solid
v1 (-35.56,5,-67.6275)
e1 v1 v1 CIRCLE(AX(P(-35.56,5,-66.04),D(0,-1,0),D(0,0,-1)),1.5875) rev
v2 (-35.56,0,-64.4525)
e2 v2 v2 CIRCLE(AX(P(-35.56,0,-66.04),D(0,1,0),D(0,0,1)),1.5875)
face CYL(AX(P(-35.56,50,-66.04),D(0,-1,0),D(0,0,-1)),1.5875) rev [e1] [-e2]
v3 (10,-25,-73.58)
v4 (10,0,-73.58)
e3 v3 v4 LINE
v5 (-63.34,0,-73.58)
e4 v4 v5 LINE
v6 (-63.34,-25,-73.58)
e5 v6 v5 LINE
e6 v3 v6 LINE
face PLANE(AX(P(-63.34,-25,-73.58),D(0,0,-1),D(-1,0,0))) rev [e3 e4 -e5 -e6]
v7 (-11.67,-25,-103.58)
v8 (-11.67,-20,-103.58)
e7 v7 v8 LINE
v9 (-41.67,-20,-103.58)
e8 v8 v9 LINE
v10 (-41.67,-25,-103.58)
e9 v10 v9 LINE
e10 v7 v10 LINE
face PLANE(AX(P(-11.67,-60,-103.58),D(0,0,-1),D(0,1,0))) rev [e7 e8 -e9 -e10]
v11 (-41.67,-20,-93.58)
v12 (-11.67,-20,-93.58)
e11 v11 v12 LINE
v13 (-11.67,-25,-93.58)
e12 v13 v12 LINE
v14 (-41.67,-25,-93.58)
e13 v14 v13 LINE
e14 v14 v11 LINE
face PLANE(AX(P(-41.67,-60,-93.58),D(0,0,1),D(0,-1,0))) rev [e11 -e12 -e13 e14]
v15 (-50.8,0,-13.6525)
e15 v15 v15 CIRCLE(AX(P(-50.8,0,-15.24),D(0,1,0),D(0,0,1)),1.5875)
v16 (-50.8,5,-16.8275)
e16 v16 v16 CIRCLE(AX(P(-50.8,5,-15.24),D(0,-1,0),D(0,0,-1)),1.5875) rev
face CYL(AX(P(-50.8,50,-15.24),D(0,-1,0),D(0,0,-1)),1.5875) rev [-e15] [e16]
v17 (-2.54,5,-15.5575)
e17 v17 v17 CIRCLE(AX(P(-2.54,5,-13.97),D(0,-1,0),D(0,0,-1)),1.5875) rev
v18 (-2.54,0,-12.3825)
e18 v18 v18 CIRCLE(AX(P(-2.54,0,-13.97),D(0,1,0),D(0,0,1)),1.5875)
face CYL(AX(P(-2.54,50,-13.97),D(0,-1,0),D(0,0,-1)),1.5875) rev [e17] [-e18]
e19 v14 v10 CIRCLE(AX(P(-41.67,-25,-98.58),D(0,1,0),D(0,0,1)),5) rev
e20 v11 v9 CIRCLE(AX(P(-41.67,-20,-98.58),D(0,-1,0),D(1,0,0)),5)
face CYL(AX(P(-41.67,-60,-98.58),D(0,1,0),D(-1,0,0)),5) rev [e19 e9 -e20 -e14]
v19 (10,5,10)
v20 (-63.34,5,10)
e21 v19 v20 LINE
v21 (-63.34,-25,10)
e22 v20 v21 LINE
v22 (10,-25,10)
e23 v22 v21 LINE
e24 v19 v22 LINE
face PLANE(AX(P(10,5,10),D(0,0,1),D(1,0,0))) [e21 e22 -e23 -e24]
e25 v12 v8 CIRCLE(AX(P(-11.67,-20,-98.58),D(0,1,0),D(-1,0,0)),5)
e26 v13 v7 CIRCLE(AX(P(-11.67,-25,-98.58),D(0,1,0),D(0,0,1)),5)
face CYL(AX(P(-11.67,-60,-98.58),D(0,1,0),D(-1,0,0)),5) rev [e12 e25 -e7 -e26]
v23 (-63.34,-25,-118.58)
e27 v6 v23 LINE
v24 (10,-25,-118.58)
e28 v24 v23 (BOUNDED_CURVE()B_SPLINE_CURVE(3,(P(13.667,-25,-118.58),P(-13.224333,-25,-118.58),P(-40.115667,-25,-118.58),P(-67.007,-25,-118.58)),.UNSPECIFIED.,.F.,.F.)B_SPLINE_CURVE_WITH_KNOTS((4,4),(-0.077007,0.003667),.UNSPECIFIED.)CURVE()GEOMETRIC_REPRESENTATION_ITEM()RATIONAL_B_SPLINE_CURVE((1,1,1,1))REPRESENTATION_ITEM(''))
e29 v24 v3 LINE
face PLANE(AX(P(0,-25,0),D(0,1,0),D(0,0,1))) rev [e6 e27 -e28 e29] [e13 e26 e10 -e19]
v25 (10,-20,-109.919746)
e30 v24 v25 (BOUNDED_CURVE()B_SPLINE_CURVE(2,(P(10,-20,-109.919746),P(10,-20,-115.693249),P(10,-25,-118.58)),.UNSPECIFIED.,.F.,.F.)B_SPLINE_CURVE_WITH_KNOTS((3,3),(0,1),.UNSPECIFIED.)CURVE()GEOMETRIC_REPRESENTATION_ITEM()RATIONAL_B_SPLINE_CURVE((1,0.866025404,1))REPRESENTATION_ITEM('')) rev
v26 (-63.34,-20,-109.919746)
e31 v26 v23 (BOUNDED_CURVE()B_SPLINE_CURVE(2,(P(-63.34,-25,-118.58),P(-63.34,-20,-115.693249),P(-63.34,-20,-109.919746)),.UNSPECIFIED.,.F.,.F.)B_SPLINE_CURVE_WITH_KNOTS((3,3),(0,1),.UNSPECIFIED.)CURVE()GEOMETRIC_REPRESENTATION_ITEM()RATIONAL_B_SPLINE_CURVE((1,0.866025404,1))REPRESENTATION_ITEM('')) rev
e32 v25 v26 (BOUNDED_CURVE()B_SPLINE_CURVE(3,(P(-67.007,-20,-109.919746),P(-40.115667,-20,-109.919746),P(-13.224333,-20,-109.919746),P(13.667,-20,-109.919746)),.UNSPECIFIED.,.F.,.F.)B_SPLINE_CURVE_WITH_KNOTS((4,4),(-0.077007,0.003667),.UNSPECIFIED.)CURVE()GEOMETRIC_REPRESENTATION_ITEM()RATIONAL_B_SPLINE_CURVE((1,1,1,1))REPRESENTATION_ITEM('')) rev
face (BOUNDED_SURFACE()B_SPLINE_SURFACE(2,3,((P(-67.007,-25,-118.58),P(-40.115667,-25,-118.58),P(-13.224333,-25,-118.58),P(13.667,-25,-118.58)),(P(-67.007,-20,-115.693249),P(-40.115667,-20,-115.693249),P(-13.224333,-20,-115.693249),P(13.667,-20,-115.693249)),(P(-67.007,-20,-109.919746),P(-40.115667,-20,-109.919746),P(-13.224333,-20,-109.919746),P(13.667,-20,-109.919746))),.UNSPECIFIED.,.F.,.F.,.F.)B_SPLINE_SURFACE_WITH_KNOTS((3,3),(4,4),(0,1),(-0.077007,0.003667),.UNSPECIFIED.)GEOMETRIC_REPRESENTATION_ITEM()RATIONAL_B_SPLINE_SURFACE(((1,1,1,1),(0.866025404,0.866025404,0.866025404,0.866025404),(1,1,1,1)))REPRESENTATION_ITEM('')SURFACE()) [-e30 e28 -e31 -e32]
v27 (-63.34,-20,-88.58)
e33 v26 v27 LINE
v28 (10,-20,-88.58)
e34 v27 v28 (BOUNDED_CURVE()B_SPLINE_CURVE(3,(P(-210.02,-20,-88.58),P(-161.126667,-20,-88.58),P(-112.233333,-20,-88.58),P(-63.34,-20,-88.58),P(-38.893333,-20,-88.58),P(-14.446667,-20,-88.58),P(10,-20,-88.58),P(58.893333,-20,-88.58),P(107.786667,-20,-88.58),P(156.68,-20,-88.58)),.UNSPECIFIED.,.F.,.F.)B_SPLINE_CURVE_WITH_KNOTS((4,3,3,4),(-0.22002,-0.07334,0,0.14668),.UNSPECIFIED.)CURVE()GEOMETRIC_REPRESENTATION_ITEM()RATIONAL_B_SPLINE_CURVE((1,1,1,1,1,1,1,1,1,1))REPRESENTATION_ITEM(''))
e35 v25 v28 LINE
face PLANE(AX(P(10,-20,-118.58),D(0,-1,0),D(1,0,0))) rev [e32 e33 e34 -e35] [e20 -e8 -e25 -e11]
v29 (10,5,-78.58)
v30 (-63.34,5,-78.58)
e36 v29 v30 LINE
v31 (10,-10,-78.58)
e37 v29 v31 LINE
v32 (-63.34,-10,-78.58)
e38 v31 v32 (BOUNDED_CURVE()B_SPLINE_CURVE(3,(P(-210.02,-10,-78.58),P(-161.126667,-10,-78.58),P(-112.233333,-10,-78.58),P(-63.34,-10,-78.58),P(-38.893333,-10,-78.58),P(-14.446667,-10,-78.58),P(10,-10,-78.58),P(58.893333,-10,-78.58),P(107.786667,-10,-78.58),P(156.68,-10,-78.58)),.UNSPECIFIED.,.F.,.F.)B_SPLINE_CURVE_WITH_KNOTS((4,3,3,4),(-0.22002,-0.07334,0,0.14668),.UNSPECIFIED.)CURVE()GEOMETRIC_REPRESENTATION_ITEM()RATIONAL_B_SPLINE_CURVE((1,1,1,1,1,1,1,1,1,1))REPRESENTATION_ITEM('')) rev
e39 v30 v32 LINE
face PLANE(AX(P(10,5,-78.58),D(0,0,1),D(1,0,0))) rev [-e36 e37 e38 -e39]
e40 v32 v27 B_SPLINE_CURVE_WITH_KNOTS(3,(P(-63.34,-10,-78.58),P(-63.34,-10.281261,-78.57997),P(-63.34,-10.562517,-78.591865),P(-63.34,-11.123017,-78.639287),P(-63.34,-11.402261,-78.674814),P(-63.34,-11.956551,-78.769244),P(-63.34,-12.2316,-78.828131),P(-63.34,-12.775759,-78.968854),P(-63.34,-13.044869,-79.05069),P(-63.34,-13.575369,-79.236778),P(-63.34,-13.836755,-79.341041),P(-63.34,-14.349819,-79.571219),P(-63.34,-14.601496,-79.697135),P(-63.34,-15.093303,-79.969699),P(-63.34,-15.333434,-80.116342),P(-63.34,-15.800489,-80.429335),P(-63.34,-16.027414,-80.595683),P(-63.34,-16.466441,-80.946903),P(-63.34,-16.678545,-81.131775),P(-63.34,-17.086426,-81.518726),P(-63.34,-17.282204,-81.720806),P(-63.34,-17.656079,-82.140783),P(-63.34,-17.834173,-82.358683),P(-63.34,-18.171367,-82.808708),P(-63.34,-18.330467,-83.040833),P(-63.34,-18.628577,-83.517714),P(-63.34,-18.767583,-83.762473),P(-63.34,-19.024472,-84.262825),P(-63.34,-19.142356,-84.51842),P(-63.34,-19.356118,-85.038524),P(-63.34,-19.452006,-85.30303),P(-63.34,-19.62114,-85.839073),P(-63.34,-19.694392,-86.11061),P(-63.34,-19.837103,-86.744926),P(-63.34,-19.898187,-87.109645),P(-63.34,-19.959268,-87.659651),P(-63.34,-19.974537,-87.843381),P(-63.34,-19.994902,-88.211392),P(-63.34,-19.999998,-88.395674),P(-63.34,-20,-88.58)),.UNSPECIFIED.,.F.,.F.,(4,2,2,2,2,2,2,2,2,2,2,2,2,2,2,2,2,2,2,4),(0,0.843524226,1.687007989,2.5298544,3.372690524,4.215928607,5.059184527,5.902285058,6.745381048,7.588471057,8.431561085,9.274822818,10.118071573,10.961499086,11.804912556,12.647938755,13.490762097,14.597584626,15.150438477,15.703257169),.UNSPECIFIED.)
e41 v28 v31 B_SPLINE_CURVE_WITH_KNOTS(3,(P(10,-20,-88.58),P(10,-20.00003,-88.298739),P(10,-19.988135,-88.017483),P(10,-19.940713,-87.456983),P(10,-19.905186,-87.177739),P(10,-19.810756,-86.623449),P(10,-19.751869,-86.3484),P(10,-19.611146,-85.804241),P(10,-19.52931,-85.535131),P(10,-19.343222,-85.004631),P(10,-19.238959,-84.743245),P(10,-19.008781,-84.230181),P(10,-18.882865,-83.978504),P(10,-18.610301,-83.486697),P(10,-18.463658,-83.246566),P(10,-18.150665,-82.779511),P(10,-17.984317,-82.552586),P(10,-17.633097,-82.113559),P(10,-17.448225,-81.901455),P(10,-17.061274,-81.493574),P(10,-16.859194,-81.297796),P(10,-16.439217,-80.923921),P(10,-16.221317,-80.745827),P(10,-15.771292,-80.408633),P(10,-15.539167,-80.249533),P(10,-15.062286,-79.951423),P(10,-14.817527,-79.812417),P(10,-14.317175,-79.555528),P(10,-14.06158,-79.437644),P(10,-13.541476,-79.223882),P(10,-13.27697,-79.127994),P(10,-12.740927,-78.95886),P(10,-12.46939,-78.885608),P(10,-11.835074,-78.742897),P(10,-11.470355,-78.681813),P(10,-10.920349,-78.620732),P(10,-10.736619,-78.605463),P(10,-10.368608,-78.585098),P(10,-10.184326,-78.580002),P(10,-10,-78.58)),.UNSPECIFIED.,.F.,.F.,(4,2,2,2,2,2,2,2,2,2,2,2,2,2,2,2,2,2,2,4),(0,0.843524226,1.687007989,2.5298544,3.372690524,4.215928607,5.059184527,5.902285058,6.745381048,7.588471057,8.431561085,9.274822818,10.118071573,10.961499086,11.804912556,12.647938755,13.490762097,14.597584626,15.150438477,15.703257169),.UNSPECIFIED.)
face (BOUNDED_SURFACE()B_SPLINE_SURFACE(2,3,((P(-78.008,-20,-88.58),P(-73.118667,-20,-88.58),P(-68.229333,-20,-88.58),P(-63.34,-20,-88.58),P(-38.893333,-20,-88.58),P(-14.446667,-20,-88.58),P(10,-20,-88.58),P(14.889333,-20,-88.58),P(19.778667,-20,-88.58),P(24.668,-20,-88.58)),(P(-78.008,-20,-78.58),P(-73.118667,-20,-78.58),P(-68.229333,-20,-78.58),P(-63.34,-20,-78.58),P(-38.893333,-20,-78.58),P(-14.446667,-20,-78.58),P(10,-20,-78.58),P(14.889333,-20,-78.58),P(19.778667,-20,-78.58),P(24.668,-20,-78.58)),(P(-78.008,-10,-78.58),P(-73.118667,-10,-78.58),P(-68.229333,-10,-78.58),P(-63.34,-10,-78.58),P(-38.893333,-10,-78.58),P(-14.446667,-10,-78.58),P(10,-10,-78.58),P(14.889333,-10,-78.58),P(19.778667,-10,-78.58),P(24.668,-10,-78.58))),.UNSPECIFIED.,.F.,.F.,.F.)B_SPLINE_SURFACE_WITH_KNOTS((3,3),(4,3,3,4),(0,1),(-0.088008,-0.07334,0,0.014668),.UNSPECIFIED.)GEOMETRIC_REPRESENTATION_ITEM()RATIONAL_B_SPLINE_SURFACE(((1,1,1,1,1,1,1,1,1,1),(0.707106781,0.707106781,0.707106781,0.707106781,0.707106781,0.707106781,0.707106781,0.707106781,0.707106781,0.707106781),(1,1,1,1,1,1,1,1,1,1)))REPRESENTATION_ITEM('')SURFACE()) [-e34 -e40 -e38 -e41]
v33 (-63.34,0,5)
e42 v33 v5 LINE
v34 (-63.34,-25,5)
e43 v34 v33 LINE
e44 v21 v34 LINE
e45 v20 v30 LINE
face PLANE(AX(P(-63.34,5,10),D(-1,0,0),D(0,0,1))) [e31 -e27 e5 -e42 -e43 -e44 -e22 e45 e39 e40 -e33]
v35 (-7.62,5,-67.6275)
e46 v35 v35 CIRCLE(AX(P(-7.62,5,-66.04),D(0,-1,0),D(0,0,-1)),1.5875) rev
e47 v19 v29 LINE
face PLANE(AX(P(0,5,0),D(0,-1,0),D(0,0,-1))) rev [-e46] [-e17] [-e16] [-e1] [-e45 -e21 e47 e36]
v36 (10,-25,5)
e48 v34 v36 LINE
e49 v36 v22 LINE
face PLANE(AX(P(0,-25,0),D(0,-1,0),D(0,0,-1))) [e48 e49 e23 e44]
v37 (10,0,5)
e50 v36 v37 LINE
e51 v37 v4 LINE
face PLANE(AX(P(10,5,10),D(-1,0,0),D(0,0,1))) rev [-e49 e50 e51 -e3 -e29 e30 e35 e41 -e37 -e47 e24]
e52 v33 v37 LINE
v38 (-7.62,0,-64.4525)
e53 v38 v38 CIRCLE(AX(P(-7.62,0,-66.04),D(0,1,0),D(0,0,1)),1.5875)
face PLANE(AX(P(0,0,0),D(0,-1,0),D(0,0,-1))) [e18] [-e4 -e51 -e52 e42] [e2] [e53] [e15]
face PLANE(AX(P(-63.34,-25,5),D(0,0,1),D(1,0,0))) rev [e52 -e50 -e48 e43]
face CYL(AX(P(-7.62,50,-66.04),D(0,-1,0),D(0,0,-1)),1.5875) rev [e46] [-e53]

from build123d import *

# Parameters (mm, degrees)
SKETCH2_W           = 73.34
SKETCH2_H           = 88.58
BOSS_EXTRUDE1_DEPTH = 5
SKETCH1_R           = 1.5875
CUT_EXTRUDE3_DEPTH  = 50
SKETCH3_W           = 73.34
SKETCH3_H           = 5
BOSS_EXTRUDE2_DEPTH = 25
SKETCH4_W           = 73.34
SKETCH4_H           = 5
BOSS_EXTRUDE3_DEPTH = 40
CUT_EXTRUDE4_DEPTH  = 40
VARFILLET1_START    = -64
VARFILLET1_DEPTH    = 75
VARFILLET2_START    = -63.34
VARFILLET2_DEPTH    = 73.34


with BuildPart() as part:
    # Sketch2 → Boss-Extrude1 (new body)
    with BuildSketch(Plane(origin=(0, 0, 0), x_dir=(1, 0, 0), z_dir=(0, 1, 0))):
        with Locations((-26.67, 34.29)):
            Rectangle(SKETCH2_W, SKETCH2_H)
    extrude(amount=BOSS_EXTRUDE1_DEPTH)

    # Sketch1 → Cut-Extrude3 (cut)
    with BuildSketch(Plane(origin=(0, 0, 0), x_dir=(1, 0, 0), z_dir=(0, 1, 0))):
        with Locations(Location((-7.62, 66.04, 0), (0, 0, 90))):
            Circle(SKETCH1_R)
        with Locations(Location((-35.56, 66.04, 0), (0, 0, 90))):
            Circle(SKETCH1_R)
        with Locations(Location((-2.54, 13.97, 0), (0, 0, 90))):
            Circle(SKETCH1_R)
        with Locations(Location((-50.8, 15.24, 0), (0, 0, 90))):
            Circle(SKETCH1_R)
    extrude(amount=CUT_EXTRUDE3_DEPTH, mode=Mode.SUBTRACT)

    # Sketch3 → Boss-Extrude2 (add)
    with BuildSketch(Plane.XZ):
        with Locations((-26.67, -76.08)):
            Rectangle(SKETCH3_W, SKETCH3_H)
        with Locations((-26.67, 7.5)):
            Rectangle(SKETCH3_W, SKETCH3_H)
    extrude(amount=BOSS_EXTRUDE2_DEPTH)

    # Sketch4 → Boss-Extrude3 (add)
    with BuildSketch(Plane(origin=(0, 0, -78.58), x_dir=(-1, 0, 0), z_dir=(0, 0, -1))):
        with Locations((26.67, -22.5)):
            Rectangle(SKETCH4_W, SKETCH4_H)
    extrude(amount=BOSS_EXTRUDE3_DEPTH)

    # Sketch5 → Cut-Extrude4 (cut)
    with BuildSketch(Plane(origin=(0, -20, 0), x_dir=(1, 0, 0), z_dir=(0, 1, 0))):
        with BuildLine():
            Line((-41.67, 93.58), (-11.67, 93.58))
            ThreePointArc((-11.67, 93.58), (-6.67, 98.58), (-11.67, 103.58))
            Line((-11.67, 103.58), (-41.67, 103.58))
            ThreePointArc((-41.67, 103.58), (-46.67, 98.58), (-41.67, 93.58))
        make_face()
    extrude(amount=-CUT_EXTRUDE4_DEPTH, mode=Mode.SUBTRACT)

    # VarFillet1: read off the stored shape, not the designer's step
    # VarFillet1 outline → VarFillet1 (cut)
    with BuildSketch(Plane.YZ.offset(VARFILLET1_START)):
        with BuildLine():
            add(Edge.make_bspline(
                [(-25, -118.58), (-20, -115.693248654), (-20, -109.919745962)],
                knots=[0, 0, 0, 1, 1, 1], degree=2, weights=[1, 0.866025404, 1]))
            Line((-25, -118.58), (-20, -118.58))
            Line((-20, -118.58), (-20, -109.919745962))
        make_face()
    extrude(amount=VARFILLET1_DEPTH, mode=Mode.SUBTRACT)

    # VarFillet2: read off the stored shape, not the designer's step
    # VarFillet2 outline → VarFillet2 (add)
    with BuildSketch(Plane.YZ.offset(VARFILLET2_START)):
        with BuildLine():
            Line((-20, -78.58), (-20, -88.58))
            add(Edge.make_bspline(
                [(-20, -88.58), (-20, -78.58), (-10, -78.58)],
                knots=[0, 0, 0, 1, 1, 1], degree=2, weights=[1, 0.707106781, 1]))
            Line((-10, -78.58), (-20, -78.58))
        make_face()
    extrude(amount=VARFILLET2_DEPTH)


solid = part.part
